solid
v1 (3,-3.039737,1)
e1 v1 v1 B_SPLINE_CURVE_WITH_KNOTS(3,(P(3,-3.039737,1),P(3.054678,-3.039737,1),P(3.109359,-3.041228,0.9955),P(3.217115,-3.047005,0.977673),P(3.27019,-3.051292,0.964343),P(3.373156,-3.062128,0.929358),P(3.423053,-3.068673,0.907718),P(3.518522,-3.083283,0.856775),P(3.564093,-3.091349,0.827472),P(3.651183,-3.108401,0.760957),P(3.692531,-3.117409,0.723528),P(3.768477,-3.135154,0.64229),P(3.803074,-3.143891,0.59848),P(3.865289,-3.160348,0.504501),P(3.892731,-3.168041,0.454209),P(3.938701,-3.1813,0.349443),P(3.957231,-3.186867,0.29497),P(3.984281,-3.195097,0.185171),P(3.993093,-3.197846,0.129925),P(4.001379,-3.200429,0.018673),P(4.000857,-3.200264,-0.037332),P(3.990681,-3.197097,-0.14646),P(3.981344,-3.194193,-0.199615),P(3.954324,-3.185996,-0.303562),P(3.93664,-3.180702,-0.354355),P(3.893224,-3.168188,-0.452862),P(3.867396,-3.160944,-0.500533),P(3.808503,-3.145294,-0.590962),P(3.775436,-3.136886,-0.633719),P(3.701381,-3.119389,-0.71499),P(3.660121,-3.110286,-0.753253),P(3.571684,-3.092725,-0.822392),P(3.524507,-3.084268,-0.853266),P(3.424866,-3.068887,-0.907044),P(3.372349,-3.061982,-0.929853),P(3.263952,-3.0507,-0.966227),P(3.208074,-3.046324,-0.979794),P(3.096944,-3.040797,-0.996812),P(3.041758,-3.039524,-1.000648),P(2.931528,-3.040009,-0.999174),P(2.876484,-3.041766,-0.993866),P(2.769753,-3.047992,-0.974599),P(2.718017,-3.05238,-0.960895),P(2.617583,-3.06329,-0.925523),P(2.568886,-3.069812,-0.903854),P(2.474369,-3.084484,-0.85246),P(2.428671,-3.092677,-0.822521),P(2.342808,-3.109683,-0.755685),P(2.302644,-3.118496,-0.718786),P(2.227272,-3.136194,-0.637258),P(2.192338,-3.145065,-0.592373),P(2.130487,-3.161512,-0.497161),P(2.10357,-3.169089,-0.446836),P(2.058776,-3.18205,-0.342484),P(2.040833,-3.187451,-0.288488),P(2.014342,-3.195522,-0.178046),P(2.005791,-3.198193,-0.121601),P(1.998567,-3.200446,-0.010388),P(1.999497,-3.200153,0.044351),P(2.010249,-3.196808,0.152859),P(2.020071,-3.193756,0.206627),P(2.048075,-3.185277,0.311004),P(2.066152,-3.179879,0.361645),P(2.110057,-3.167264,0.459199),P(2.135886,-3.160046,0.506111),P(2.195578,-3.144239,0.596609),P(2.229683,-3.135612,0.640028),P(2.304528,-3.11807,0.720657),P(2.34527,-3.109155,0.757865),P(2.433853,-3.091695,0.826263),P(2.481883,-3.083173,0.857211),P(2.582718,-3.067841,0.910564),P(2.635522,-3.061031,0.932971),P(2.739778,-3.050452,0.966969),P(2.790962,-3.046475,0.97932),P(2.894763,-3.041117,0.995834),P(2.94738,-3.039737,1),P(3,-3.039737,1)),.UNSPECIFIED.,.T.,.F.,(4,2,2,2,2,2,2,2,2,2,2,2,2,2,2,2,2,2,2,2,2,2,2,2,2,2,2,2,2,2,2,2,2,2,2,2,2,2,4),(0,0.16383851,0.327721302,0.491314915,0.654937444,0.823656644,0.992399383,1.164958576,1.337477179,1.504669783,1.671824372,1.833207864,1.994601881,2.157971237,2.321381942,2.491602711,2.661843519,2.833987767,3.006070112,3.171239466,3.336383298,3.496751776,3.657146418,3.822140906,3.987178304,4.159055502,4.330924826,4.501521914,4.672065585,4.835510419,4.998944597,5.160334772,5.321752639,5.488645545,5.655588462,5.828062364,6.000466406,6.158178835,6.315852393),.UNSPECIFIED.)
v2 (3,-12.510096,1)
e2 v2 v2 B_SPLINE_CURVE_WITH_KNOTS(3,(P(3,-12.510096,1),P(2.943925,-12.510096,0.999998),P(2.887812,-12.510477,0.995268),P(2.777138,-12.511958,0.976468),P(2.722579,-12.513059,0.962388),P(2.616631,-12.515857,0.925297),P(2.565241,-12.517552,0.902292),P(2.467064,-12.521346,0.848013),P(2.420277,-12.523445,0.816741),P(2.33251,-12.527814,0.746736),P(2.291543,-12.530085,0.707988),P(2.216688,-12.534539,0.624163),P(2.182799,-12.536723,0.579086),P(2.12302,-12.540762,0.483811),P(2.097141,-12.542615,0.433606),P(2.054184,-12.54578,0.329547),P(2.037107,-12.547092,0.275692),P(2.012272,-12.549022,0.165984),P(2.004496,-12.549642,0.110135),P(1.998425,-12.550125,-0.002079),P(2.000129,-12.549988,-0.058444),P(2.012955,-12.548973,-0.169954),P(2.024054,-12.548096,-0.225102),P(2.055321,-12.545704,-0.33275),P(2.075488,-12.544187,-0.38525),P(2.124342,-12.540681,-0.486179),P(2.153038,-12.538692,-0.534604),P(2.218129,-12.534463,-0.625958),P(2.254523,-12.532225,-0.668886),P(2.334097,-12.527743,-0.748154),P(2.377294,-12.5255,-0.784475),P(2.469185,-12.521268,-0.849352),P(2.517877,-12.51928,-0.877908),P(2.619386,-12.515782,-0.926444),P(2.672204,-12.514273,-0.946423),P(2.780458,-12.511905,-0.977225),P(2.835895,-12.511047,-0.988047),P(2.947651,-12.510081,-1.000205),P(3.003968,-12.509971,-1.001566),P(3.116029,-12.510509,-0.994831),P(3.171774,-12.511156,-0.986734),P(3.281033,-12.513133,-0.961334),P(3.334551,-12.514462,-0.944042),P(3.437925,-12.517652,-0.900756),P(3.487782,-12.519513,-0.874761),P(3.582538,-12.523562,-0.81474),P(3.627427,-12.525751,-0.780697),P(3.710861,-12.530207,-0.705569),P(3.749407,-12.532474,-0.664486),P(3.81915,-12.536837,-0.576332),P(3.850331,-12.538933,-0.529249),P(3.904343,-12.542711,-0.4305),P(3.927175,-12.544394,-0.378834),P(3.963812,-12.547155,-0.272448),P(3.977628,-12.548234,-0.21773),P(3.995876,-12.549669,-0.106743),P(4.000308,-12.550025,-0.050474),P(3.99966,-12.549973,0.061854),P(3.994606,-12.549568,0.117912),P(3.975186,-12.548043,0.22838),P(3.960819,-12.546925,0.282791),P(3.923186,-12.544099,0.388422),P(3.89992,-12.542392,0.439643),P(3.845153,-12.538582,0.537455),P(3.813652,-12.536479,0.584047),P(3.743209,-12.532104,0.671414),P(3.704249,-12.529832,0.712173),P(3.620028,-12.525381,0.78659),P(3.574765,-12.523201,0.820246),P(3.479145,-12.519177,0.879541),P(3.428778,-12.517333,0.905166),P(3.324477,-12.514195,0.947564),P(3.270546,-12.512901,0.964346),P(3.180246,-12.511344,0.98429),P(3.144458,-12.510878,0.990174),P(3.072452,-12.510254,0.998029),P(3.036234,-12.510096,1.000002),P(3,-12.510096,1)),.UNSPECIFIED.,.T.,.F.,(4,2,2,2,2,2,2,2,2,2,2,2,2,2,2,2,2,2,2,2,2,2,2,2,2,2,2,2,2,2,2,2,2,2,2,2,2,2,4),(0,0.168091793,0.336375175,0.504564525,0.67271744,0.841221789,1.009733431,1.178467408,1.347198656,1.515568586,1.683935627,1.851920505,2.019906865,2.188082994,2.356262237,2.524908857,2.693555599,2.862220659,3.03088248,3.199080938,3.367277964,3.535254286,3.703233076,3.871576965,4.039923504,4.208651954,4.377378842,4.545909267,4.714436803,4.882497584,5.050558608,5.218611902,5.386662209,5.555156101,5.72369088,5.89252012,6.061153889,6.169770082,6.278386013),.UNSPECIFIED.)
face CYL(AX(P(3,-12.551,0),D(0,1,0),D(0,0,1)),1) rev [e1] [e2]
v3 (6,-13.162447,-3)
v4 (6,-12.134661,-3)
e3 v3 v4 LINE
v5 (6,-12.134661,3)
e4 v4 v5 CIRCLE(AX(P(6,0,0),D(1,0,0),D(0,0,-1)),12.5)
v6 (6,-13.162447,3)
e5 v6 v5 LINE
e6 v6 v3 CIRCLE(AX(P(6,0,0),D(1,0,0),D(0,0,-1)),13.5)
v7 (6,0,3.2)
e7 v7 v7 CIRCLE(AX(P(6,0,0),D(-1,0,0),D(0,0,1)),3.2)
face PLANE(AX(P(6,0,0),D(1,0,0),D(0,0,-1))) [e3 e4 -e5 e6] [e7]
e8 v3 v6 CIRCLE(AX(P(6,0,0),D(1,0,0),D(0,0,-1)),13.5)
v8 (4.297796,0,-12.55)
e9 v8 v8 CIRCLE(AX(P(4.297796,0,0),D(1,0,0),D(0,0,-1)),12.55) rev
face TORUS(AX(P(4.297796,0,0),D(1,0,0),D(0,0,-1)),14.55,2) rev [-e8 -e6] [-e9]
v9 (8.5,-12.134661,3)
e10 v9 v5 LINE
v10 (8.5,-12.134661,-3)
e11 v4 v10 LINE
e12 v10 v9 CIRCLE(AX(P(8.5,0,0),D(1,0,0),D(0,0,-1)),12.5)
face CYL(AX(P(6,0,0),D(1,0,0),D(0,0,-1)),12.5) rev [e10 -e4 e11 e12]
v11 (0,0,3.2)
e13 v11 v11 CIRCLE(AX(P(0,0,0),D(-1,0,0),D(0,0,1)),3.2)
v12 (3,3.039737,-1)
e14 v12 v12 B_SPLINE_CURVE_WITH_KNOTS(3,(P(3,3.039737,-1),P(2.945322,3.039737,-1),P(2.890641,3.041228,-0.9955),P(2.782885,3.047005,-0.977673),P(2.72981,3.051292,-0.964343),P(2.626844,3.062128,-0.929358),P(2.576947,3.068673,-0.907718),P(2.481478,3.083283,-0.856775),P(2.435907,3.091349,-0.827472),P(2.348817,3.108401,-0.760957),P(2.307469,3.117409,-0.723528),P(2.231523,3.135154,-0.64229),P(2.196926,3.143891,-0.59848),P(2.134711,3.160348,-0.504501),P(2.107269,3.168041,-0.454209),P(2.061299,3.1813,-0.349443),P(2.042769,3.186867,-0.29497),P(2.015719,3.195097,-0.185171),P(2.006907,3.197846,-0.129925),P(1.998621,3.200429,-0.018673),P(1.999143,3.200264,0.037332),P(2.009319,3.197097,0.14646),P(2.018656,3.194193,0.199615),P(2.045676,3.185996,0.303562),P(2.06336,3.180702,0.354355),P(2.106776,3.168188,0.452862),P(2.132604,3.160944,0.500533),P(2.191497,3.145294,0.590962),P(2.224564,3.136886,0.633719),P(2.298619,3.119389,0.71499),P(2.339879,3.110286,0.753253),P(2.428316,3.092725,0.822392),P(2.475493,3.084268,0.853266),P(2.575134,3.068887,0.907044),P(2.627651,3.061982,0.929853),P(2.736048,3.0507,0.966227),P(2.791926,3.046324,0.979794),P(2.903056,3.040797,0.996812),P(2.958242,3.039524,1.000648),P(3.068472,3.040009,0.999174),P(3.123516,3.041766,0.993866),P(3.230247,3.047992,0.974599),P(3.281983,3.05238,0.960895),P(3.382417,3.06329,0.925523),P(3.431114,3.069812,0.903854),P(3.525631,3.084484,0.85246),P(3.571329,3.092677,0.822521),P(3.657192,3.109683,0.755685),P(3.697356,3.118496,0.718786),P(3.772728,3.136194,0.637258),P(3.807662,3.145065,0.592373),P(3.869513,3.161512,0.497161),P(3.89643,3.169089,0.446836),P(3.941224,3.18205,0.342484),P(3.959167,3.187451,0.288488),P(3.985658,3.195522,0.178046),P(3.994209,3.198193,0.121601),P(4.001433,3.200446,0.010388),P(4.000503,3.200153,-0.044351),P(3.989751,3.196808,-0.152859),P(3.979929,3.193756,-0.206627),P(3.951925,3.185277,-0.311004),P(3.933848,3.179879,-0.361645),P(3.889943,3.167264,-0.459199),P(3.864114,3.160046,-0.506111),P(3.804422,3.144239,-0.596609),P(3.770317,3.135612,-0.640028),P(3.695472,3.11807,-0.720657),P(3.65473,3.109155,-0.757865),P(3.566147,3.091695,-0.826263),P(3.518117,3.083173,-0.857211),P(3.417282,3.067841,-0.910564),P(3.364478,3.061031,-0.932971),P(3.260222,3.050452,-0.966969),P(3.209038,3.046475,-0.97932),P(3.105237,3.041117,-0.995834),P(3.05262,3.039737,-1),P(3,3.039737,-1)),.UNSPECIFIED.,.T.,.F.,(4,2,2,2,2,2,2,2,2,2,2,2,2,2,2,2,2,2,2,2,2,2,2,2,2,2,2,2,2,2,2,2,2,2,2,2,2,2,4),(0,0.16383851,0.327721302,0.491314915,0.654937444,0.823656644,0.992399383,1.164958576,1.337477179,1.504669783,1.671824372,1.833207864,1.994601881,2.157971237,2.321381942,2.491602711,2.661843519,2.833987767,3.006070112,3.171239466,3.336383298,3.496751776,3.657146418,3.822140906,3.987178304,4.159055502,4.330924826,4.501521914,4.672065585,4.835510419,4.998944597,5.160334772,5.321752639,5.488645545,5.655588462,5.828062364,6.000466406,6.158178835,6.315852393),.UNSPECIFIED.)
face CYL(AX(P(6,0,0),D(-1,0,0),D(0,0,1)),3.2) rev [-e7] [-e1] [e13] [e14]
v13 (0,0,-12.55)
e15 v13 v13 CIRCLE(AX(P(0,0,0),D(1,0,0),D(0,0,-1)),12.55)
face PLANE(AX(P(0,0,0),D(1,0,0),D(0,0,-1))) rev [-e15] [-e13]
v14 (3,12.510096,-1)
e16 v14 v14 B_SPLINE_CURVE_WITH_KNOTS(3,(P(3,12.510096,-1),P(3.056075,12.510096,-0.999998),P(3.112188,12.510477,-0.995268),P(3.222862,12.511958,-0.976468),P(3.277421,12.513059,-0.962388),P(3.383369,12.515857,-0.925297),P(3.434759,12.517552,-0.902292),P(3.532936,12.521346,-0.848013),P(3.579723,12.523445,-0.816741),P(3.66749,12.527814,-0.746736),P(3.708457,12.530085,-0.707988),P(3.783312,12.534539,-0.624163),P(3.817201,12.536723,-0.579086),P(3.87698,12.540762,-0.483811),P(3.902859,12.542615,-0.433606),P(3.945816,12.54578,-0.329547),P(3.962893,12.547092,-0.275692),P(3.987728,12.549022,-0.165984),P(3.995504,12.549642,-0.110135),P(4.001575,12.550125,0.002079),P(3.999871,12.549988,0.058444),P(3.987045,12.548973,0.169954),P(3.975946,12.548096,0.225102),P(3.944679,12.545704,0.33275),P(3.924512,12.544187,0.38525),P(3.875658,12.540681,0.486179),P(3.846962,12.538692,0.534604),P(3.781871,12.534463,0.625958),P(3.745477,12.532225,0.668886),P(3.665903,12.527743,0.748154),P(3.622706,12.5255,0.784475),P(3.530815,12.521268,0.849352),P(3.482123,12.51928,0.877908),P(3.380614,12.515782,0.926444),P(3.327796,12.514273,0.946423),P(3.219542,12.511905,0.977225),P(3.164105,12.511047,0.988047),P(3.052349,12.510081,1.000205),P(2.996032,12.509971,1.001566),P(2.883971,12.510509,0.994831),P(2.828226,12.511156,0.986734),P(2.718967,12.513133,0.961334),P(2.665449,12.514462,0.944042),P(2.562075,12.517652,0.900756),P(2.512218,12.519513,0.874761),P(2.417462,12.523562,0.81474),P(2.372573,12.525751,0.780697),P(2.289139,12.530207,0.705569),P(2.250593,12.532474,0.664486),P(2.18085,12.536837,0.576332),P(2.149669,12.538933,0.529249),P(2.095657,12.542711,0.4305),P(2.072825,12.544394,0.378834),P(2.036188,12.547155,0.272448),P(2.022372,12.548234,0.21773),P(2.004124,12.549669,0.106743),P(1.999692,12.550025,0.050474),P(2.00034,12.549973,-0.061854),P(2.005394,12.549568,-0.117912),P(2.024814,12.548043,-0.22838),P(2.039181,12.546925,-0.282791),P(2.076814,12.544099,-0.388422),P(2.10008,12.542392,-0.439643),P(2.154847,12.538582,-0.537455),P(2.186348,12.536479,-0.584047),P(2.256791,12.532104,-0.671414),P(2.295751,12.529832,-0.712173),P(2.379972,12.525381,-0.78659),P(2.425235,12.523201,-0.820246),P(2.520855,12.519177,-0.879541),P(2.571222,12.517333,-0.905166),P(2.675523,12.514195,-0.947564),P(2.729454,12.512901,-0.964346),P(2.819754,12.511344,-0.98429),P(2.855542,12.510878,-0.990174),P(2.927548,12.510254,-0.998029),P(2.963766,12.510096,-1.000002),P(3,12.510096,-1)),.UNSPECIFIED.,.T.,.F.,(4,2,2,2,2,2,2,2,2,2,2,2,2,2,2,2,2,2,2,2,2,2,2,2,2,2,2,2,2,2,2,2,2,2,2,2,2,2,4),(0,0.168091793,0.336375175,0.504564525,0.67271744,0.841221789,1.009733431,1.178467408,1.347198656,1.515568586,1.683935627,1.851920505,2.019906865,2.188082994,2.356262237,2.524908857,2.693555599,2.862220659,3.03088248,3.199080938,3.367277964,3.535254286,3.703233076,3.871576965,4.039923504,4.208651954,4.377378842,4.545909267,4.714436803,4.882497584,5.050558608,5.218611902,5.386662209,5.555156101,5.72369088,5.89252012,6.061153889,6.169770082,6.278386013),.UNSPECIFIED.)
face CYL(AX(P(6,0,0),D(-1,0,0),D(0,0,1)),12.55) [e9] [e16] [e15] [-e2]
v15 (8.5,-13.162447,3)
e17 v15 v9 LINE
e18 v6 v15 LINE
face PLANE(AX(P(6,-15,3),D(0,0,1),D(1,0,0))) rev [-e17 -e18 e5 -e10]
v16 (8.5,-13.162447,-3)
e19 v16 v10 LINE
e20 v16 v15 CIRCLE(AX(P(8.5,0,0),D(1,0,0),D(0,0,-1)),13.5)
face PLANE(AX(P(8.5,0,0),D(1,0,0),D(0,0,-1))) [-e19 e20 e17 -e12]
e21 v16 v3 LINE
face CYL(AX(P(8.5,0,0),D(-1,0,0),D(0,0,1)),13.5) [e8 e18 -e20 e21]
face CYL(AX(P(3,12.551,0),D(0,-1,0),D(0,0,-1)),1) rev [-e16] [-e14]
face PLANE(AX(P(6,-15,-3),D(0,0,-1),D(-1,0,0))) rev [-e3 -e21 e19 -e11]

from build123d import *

# Parameters (mm, degrees)
SKETCH_1_R                      = 12.55
EXTRUDE_1_DEPTH                 = 6
SKETCH_2_R                      = 3.2
CUT_EXTRUDE_1_DEPTH             = 6
CUT_EXTRUDE_2_REACH             = 20.735
SKETCH_3_R                      = 1
CUT_EXTRUDE_2_DIRECTION_2_REACH = 20.735
SKETCH_4_R                      = 13.5
EXTRUDE_2_DEPTH                 = 2.5
SKETCH_5_R                      = 12.5
CUT_EXTRUDE_3_DEPTH             = 2.5
FILLET_2_R                      = 2
SKETCH_6_W                      = 2.5
SKETCH_6_H                      = 6
CUT_EXTRUDE_4_DEPTH             = 15


with BuildPart() as part:
    # 草图1 → 凸台-拉伸1 (new body)
    with BuildSketch(Plane(origin=(0, 0, 0), x_dir=(0, 0, -1), z_dir=(1, 0, 0))):
        Circle(SKETCH_1_R)
    extrude(amount=EXTRUDE_1_DEPTH)

    # 草图2 → 切除-拉伸1 (cut)
    with BuildSketch(Plane.ZY):
        Circle(SKETCH_2_R)
    extrude(amount=-CUT_EXTRUDE_1_DEPTH, mode=Mode.SUBTRACT)

    # 草图3 → 切除-拉伸2 (cut, up to next)
    with BuildSketch(Plane(origin=(0, 0, 0), x_dir=(1, 0, 0), z_dir=(0, 1, 0)), mode=Mode.PRIVATE) as cut_extrude_2_sk1:
        with Locations(Location((3, 0, 0), (0, 0, 270))):
            Circle(SKETCH_3_R)
    cut_extrude_2_tool1 = extrude(cut_extrude_2_sk1.sketch, amount=-CUT_EXTRUDE_2_REACH, mode=Mode.PRIVATE) & part.part
    add(cut_extrude_2_tool1.solids().sort_by_distance((3, 0, 0))[0], mode=Mode.SUBTRACT)

    # 草图3 → 切除-拉伸2 direction 2 (cut, up to next)
    with BuildSketch(Plane(origin=(0, 0, 0), x_dir=(1, 0, 0), z_dir=(0, 1, 0)), mode=Mode.PRIVATE) as cut_extrude_2_direction_2_sk1:
        with Locations(Location((3, 0, 0), (0, 0, 270))):
            Circle(SKETCH_3_R)
    cut_extrude_2_direction_2_tool1 = extrude(cut_extrude_2_direction_2_sk1.sketch, amount=CUT_EXTRUDE_2_DIRECTION_2_REACH, mode=Mode.PRIVATE) & part.part
    add(cut_extrude_2_direction_2_tool1.solids().sort_by_distance((3, 0, 0))[0], mode=Mode.SUBTRACT)

    # 草图4 → 凸台-拉伸2 (add)
    with BuildSketch(Plane(origin=(6, 0, 0), x_dir=(0, 0, -1), z_dir=(1, 0, 0))):
        Circle(SKETCH_4_R)
    extrude(amount=EXTRUDE_2_DEPTH)

    # 草图5 → 切除-拉伸3 (cut)
    with BuildSketch(Plane(origin=(8.5, 0, 0), x_dir=(0, 0, -1), z_dir=(1, 0, 0))):
        Circle(SKETCH_5_R)
    extrude(amount=-CUT_EXTRUDE_3_DEPTH, mode=Mode.SUBTRACT)

    # 圆角2
    # the kernel refuses this fillet: 2 mm, written as the material it adds along each edge
    with BuildSketch(Plane(origin=(6, 0, 0), x_dir=(0, 0, -1), z_dir=(0, -1, 0))) as fillet_2_piece_1:
        with BuildLine():
            CenterArc((14.55, -1.702204453), FILLET_2_R, 121.668243254, 58.331756746)
            Line((12.55, -1.702204453), (12.51, -1.702204453))
            Line((12.51, -1.702204453), (12.51, 0))
            Line((12.51, 0), (12.55, 0.04))
            ThreePointArc((12.55, 0.04), (13.025, 0.04), (13.479, 0.034044089))
            Line((13.479, 0.034044089), (13.5, 0))
        make_face()
    revolve(axis=Axis((6, 0, 0), (1, 0, 0)))

    # 草图6 → 切除-拉伸4 (cut)
    with BuildSketch(Plane(origin=(0, 0, 0), x_dir=(1, 0, 0), z_dir=(0, 1, 0))):
        with Locations((7.25, 0)):
            Rectangle(SKETCH_6_W, SKETCH_6_H)
    extrude(amount=-CUT_EXTRUDE_4_DEPTH, mode=Mode.SUBTRACT)


solid = part.part
